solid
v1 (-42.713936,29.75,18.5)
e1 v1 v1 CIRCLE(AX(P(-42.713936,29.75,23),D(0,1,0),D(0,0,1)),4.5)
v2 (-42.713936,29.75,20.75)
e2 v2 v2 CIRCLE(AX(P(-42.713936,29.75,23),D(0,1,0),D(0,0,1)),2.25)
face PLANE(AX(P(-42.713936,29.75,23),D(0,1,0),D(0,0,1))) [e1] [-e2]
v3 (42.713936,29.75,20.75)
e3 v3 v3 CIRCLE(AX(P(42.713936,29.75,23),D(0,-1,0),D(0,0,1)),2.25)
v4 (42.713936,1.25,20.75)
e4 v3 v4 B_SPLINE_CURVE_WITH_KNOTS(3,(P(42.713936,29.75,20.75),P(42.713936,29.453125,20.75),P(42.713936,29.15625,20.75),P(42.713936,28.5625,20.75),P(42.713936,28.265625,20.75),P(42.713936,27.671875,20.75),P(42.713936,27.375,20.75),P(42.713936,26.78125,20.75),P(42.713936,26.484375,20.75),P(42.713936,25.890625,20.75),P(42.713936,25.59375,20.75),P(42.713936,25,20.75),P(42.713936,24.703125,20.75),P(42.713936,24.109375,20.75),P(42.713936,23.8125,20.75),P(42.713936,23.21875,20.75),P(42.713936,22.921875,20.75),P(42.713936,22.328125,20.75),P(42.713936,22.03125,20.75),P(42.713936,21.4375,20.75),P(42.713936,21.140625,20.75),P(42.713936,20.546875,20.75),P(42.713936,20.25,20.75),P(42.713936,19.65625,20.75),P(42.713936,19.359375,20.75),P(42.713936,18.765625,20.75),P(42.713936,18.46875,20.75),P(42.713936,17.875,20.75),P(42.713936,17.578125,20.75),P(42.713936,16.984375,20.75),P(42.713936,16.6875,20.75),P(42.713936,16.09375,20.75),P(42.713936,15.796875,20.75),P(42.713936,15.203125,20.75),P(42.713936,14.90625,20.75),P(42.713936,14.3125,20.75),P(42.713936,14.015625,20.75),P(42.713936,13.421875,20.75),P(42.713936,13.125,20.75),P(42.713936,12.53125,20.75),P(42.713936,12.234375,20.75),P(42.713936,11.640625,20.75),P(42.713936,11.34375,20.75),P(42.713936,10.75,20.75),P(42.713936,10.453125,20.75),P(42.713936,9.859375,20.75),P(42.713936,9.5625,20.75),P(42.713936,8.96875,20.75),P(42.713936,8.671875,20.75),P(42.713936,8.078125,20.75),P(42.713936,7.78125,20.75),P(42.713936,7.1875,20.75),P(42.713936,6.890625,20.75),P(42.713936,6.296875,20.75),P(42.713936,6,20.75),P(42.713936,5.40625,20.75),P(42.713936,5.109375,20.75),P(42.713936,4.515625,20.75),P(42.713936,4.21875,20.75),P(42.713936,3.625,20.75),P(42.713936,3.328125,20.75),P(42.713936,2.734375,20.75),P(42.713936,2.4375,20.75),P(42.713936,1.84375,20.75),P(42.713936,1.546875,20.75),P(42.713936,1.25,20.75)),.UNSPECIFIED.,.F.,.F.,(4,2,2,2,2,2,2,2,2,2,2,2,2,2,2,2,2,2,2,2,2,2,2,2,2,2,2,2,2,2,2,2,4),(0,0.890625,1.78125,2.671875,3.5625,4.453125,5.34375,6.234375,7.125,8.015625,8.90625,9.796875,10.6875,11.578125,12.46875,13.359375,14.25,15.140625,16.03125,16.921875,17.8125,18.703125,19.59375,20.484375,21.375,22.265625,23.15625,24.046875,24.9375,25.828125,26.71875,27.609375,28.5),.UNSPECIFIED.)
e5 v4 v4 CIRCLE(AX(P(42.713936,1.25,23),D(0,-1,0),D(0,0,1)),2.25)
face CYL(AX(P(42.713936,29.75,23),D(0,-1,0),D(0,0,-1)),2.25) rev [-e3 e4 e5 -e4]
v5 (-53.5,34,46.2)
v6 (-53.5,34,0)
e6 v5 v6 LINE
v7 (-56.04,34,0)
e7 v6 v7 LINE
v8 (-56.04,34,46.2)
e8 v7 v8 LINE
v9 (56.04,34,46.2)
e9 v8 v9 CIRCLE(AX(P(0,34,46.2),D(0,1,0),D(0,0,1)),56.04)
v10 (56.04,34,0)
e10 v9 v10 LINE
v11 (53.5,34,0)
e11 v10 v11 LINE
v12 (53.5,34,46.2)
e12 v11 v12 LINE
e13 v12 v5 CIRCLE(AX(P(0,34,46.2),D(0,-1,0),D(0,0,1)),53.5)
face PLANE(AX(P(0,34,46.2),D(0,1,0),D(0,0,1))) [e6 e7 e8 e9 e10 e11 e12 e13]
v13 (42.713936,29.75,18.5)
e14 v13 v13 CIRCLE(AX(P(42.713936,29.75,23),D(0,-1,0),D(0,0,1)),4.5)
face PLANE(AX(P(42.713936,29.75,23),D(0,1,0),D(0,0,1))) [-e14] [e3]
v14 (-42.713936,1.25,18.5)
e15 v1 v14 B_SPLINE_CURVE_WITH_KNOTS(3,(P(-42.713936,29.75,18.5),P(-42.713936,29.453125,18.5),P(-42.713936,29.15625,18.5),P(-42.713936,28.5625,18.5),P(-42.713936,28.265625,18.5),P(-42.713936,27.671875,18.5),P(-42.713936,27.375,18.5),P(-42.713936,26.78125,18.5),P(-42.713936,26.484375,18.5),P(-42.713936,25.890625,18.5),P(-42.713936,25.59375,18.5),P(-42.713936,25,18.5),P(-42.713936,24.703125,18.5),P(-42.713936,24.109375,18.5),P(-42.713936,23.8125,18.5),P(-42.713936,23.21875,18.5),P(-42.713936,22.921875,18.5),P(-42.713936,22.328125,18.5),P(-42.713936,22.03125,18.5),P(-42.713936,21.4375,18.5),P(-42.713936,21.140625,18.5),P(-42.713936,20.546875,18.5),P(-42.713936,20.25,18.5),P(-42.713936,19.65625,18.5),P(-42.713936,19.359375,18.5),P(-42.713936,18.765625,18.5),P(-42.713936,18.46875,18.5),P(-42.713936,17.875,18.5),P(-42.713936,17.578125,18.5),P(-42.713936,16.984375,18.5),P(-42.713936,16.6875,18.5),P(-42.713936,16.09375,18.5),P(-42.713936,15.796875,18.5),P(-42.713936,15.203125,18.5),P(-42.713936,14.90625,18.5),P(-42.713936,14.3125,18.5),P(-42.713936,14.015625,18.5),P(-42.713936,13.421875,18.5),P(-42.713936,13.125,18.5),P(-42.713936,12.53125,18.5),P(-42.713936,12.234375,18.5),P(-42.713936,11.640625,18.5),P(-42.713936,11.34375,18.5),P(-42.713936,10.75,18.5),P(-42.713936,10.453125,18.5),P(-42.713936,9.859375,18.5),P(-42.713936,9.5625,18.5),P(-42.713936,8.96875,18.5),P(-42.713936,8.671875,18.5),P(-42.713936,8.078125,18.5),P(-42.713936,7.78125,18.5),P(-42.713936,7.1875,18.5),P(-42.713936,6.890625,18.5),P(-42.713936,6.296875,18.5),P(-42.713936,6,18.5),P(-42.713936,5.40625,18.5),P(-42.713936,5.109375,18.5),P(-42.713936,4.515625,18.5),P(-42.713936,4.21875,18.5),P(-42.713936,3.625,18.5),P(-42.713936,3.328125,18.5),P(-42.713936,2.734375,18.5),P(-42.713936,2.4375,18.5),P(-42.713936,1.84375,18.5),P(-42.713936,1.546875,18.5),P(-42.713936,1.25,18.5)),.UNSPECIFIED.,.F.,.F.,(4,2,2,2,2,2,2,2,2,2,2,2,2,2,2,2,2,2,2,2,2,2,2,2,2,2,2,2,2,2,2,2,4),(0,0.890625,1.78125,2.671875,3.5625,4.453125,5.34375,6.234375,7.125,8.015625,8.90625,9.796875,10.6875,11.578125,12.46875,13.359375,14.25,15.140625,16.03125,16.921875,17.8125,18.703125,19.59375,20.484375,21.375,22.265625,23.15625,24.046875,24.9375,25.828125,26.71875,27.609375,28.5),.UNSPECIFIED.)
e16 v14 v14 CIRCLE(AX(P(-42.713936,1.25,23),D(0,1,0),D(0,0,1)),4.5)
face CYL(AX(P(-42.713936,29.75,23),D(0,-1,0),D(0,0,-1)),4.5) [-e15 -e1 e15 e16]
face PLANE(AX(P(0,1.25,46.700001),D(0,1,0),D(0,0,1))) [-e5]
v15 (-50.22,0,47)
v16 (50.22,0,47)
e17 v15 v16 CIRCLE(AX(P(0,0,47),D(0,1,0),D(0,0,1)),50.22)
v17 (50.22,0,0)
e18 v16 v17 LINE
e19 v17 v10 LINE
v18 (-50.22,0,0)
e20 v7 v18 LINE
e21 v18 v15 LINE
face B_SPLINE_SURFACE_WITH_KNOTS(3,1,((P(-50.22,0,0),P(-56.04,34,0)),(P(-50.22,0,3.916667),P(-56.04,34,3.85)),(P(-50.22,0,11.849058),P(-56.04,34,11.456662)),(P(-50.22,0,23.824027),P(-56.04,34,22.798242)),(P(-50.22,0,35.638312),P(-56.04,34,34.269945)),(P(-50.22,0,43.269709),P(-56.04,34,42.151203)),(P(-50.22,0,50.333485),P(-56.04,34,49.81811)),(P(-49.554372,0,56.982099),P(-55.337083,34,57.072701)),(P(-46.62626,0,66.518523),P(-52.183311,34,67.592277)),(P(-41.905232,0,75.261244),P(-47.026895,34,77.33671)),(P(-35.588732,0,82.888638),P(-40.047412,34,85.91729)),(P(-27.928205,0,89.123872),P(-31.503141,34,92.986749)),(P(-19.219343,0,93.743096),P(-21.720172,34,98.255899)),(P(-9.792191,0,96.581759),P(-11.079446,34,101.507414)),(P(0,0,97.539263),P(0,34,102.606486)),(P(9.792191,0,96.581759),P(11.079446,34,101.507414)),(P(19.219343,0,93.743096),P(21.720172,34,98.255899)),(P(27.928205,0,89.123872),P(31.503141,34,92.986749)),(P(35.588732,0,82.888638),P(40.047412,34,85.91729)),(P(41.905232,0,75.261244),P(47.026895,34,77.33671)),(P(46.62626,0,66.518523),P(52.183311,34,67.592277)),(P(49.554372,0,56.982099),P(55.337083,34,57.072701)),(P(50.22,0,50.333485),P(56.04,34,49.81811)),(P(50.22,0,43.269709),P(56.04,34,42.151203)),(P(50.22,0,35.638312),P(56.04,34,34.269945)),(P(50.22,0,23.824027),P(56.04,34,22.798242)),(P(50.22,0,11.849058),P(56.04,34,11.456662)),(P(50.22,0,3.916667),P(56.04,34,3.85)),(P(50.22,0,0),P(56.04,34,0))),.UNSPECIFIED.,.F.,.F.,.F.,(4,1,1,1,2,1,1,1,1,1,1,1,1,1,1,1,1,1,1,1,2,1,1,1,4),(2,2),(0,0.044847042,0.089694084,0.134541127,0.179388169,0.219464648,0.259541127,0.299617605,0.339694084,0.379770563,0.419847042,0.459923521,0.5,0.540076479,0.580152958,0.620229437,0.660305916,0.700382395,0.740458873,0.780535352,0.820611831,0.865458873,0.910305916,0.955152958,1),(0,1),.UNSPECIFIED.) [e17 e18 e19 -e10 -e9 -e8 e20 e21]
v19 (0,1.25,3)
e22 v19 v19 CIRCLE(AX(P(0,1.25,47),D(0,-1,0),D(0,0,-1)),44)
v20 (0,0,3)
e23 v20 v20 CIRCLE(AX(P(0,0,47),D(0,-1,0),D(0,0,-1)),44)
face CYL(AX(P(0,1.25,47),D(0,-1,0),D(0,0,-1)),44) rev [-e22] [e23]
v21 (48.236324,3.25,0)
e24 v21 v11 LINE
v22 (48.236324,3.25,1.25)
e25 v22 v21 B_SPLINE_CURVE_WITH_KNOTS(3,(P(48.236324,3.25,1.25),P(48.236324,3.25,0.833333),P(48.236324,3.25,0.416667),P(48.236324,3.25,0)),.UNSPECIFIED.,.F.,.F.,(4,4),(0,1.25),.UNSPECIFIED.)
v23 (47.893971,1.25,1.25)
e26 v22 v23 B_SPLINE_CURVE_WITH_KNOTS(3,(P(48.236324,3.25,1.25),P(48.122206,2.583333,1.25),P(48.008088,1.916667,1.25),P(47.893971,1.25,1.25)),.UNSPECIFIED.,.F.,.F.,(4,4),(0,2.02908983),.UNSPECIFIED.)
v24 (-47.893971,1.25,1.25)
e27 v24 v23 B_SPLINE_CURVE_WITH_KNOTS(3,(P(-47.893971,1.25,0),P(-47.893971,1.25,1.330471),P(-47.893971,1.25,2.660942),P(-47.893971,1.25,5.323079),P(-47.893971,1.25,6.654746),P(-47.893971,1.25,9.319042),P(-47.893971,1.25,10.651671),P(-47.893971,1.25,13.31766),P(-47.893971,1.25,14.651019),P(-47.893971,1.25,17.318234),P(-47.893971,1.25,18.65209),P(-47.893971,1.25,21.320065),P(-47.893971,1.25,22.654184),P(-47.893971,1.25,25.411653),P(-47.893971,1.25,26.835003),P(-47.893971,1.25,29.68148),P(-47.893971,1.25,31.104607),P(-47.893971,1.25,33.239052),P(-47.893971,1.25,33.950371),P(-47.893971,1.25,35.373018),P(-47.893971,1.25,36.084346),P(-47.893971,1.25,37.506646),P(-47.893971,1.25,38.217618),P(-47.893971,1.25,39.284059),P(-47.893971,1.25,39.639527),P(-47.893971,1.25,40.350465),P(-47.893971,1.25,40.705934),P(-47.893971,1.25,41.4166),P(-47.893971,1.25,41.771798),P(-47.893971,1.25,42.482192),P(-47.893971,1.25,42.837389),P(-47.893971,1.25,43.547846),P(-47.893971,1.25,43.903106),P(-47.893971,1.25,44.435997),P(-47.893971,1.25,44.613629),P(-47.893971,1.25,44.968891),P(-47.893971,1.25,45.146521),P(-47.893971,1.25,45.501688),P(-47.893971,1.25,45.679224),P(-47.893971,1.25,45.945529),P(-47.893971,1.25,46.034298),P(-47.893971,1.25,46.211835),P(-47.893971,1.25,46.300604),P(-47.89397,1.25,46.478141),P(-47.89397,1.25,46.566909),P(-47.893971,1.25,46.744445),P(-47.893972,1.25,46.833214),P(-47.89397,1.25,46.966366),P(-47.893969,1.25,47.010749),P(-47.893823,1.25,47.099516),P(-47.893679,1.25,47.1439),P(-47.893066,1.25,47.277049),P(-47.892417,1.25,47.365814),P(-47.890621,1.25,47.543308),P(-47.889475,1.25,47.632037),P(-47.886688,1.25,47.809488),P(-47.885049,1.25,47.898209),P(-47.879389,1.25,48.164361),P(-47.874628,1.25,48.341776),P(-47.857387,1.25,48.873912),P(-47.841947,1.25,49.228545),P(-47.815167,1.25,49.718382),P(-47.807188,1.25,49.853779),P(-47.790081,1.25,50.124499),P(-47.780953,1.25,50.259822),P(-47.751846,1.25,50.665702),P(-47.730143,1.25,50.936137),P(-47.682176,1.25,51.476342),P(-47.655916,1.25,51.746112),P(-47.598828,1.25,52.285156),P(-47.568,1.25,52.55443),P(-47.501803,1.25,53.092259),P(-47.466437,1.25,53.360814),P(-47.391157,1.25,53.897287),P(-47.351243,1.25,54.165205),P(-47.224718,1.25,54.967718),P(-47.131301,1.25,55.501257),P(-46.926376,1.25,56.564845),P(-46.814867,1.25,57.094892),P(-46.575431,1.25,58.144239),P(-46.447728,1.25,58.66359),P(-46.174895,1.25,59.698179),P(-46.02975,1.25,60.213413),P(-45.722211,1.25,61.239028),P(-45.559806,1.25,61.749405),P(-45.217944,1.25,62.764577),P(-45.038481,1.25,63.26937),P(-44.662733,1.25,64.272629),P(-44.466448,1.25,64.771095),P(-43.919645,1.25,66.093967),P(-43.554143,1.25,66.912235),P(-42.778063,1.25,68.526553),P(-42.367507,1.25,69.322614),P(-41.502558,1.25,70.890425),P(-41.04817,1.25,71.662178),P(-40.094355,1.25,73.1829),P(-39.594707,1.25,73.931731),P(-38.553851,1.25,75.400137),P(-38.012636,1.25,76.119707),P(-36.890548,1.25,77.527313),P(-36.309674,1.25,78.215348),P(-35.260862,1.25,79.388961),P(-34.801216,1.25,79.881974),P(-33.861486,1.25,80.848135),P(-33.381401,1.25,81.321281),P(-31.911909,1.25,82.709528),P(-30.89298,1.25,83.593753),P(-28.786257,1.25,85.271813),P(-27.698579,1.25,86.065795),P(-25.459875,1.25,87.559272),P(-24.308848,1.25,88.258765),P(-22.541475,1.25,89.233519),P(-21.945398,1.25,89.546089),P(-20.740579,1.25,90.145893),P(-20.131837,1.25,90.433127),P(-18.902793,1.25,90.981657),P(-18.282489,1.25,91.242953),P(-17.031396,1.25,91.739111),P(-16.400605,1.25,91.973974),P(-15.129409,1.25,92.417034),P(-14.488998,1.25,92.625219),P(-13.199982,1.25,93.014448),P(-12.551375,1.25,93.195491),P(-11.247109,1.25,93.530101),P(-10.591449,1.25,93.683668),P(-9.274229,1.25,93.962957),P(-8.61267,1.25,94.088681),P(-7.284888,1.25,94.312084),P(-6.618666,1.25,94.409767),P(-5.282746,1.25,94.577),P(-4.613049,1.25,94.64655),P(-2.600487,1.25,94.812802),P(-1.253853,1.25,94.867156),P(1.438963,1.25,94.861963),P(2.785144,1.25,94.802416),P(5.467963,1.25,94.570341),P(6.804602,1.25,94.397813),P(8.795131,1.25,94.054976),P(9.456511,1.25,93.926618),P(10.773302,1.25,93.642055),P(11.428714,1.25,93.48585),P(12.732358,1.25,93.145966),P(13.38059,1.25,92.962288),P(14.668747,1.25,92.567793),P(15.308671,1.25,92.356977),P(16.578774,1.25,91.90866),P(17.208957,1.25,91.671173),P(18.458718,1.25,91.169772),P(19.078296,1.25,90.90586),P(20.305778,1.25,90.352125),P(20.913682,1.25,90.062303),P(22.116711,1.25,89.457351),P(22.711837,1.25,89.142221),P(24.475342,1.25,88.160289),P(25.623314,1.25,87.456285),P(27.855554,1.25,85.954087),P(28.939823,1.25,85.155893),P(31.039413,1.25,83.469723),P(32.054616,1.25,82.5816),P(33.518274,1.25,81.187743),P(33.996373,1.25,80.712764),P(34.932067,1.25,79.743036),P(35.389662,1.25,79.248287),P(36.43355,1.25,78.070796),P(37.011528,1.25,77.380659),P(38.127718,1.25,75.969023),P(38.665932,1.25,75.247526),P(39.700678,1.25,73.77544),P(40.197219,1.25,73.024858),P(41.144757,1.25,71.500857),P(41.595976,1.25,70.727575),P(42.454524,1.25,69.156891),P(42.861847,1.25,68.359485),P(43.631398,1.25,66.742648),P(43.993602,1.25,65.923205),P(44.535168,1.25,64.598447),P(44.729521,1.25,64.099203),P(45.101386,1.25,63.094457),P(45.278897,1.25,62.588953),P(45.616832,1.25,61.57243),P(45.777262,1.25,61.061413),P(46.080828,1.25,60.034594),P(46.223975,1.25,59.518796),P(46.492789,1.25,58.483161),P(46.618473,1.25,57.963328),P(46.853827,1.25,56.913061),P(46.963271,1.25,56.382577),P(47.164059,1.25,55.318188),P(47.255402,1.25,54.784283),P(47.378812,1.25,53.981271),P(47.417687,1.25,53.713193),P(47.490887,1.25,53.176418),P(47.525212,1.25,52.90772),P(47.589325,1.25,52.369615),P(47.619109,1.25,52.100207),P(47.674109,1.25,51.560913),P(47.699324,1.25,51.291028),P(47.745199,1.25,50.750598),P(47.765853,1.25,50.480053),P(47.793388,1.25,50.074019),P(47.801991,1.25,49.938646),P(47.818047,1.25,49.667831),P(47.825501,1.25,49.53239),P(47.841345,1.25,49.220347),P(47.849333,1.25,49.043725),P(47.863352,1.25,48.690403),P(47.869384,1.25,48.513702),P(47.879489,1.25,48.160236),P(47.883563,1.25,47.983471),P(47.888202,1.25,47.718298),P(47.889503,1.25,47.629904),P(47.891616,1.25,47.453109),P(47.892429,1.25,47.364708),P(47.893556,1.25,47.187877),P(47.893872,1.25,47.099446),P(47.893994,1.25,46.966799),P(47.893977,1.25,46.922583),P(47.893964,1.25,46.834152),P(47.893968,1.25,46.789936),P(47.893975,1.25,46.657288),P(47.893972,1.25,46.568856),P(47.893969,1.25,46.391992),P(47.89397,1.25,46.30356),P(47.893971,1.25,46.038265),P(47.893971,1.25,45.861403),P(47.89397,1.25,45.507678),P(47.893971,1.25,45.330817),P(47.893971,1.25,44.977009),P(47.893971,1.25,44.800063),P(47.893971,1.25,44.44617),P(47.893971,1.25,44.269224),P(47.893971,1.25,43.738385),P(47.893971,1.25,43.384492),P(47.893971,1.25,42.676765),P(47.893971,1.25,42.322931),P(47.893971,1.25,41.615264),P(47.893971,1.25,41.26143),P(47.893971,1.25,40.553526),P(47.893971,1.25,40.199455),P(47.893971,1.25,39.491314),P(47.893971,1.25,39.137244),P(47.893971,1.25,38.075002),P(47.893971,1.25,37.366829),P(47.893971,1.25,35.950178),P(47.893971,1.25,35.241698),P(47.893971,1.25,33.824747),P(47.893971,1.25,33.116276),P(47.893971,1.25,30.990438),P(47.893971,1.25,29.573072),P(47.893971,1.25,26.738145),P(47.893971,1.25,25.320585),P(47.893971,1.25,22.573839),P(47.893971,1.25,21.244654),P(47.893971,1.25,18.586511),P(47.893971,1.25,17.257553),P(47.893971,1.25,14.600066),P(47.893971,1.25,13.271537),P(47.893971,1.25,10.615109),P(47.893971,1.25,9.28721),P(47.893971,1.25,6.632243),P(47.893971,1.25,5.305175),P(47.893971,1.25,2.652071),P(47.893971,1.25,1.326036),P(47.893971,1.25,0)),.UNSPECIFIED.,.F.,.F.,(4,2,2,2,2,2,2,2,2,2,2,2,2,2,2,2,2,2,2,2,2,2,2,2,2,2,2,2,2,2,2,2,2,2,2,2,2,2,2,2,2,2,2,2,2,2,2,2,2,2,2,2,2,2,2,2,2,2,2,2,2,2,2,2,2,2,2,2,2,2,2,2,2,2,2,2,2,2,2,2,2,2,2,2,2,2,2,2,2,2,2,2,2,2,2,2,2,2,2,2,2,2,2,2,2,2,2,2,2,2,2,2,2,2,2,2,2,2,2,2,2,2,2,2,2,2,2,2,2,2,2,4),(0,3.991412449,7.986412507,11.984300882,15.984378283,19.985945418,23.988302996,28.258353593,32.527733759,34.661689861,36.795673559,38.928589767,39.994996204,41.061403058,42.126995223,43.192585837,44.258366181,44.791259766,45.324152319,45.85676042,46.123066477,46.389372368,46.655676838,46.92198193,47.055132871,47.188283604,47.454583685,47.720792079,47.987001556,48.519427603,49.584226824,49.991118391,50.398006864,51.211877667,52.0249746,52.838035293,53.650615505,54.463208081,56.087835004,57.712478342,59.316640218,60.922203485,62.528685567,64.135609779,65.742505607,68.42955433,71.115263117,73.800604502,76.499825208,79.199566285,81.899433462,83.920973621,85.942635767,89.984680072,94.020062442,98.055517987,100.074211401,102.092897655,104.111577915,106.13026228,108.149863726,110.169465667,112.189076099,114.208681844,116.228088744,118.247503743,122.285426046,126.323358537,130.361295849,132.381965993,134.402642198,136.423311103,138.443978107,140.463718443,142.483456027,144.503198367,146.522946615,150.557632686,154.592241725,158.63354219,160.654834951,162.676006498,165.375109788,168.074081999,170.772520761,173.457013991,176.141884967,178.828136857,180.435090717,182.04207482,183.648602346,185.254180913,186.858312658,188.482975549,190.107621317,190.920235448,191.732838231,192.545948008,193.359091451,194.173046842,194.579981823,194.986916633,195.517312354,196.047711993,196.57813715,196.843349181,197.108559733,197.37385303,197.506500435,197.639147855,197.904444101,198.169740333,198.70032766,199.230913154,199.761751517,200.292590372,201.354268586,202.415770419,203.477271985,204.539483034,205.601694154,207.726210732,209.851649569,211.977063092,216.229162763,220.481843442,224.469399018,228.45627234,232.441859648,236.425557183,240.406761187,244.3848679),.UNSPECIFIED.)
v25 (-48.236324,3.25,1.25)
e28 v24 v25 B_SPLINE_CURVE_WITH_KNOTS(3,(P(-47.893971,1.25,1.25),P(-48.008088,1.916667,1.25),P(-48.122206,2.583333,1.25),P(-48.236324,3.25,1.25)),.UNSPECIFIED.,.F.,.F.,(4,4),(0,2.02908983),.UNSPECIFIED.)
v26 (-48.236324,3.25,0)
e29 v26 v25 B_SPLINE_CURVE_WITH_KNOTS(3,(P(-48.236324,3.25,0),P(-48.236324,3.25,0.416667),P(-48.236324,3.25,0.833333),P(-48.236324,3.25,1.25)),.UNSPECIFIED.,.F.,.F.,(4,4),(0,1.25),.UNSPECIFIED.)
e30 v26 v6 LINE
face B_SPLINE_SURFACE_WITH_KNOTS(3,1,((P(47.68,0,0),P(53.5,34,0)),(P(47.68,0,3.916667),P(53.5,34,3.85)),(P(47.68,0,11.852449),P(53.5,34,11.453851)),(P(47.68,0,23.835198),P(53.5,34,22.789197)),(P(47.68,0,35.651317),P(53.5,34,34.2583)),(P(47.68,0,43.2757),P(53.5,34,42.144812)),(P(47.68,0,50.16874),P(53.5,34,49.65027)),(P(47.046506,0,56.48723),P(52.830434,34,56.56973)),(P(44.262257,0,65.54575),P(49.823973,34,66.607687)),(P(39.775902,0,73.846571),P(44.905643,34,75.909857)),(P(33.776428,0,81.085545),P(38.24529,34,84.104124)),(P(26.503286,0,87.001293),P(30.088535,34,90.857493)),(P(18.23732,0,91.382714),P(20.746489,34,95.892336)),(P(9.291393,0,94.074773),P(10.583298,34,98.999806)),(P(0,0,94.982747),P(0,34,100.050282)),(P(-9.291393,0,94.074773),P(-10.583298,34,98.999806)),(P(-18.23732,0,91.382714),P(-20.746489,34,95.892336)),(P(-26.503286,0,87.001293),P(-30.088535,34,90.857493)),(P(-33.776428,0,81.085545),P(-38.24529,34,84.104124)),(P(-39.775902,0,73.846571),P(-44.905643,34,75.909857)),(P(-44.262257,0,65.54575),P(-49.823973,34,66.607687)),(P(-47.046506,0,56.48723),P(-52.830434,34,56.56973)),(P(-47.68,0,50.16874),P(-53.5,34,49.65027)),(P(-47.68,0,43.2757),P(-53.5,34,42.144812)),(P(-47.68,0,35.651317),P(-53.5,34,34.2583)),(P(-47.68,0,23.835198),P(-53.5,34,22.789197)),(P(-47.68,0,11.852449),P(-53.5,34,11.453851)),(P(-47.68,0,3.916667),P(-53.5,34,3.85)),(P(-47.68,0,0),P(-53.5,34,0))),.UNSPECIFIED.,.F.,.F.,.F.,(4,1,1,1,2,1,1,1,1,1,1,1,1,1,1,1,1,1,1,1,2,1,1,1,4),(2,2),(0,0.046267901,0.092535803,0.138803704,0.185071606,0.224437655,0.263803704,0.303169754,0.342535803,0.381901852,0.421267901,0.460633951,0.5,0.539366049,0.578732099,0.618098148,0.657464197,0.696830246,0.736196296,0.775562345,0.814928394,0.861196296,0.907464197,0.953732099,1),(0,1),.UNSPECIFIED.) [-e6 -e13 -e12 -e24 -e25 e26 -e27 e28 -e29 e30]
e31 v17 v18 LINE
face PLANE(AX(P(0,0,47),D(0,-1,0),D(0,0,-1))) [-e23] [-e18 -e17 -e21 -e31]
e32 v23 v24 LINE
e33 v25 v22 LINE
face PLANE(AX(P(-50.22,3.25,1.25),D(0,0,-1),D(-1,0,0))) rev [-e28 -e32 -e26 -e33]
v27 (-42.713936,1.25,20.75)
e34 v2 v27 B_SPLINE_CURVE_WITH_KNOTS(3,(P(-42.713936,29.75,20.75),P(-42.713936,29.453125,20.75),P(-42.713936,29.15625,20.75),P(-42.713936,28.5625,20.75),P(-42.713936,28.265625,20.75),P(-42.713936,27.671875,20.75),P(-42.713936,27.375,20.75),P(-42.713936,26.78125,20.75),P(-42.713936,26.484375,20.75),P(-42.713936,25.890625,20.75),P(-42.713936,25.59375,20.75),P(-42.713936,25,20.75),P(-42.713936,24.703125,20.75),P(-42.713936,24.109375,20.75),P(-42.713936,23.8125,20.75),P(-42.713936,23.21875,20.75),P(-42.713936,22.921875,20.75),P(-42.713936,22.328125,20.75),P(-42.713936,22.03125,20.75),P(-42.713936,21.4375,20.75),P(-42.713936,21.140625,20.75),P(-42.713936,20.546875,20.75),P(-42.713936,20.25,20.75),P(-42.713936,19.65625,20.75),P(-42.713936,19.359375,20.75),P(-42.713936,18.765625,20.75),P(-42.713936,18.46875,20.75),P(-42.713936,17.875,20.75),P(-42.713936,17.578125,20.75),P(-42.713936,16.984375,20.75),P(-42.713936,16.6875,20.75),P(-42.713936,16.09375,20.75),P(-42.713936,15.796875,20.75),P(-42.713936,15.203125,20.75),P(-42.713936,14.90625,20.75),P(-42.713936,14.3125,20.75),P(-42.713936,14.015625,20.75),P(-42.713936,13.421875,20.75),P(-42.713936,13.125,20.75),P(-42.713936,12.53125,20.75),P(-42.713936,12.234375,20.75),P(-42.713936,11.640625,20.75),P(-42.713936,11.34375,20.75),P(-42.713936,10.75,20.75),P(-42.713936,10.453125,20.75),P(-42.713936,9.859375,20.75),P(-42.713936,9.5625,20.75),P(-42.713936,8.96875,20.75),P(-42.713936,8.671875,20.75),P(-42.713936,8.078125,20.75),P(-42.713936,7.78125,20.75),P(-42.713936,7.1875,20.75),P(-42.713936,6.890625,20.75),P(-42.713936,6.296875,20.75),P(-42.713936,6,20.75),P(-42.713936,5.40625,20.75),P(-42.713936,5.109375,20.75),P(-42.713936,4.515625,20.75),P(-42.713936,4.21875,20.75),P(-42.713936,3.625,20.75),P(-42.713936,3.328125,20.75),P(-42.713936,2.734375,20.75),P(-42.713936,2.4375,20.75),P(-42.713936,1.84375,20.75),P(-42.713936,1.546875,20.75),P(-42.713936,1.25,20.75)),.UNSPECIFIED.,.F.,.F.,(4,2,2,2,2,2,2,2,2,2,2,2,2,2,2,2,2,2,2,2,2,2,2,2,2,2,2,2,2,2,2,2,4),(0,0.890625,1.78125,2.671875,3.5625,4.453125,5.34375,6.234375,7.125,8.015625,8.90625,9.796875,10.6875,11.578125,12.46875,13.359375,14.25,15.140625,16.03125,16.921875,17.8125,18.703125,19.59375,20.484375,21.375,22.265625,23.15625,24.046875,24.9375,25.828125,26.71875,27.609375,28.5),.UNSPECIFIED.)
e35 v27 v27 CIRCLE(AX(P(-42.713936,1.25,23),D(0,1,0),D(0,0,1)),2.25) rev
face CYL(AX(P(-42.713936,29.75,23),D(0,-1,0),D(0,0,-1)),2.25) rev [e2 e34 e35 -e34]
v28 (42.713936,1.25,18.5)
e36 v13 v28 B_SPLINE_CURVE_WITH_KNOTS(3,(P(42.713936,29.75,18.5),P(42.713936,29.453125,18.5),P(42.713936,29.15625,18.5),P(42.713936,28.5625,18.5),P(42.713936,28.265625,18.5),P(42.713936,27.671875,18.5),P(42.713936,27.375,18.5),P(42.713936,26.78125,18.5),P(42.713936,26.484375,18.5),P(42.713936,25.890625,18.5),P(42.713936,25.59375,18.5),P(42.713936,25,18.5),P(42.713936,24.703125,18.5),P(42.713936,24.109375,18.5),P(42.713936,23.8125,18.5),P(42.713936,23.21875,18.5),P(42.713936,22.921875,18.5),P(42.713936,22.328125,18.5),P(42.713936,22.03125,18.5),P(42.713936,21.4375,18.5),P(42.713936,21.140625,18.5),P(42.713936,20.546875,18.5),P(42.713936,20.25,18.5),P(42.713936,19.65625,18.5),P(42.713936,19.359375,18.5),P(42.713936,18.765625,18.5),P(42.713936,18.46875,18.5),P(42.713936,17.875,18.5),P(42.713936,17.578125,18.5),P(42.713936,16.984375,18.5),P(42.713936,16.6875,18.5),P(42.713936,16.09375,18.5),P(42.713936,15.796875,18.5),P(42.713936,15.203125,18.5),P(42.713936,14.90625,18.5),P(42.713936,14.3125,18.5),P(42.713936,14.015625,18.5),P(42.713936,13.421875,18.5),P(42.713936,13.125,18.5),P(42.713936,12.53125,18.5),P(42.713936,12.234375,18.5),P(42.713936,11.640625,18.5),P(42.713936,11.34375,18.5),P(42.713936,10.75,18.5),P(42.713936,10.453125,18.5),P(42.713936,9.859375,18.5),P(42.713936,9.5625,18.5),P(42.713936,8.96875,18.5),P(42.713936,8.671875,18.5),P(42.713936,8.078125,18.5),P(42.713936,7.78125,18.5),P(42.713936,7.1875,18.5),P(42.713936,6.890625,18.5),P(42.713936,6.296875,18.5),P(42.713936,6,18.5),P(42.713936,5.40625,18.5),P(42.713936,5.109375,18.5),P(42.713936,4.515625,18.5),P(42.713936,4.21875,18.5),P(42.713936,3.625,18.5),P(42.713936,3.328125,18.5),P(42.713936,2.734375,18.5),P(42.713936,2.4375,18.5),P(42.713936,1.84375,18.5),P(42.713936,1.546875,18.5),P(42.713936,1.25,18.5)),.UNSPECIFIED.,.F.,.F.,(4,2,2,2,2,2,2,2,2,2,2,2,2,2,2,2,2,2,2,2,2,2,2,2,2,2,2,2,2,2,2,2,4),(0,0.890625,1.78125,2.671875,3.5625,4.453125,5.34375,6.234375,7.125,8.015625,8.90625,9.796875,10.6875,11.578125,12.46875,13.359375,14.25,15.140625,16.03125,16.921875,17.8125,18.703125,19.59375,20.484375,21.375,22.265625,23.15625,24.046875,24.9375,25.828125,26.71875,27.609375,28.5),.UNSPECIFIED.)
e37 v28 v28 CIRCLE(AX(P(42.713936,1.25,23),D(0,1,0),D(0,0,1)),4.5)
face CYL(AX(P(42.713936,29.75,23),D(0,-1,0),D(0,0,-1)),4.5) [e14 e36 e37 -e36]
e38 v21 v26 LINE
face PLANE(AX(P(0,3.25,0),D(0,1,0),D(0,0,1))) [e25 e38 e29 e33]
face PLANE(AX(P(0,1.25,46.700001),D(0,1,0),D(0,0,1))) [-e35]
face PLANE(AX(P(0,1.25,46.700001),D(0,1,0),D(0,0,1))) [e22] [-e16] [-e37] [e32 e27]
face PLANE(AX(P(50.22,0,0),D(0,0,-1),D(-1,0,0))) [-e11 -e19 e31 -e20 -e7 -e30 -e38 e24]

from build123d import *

# Parameters (mm, degrees)
SKETCH3_R                 = 44
BOSS_EXTRUDE1_DEPTH       = 1.25
SKETCH4_W                 = 100.44
SKETCH4_H                 = 1.25
BOSS_EXTRUDE2_DEPTH       = 2
BOSS_EXTRUDE3_OUTLINE_R   = 4.5
BOSS_EXTRUDE3_OUTLINE_R_2 = 2.25
BOSS_EXTRUDE3_DEPTH       = 28.5


with BuildPart() as part:
    # Sketch1 → Loft1 section 0
    with BuildSketch(Plane(origin=(0, 0, 0), x_dir=(1, 0, 0), z_dir=(0, 1, 0))):
        with BuildLine():
            Line((47.68, 0), (47.68, -47))
            ThreePointArc((47.68, -47), (0, -94.68), (-47.68, -47))
            Line((-47.68, -47), (-47.68, 0))
            Line((-47.68, 0), (-50.22, 0))
            Line((-50.22, 0), (-50.22, -47))
            ThreePointArc((-50.22, -47), (0, -97.22), (50.22, -47))
            Line((50.22, -47), (50.22, 0))
            Line((50.22, 0), (47.68, 0))
        make_face()
    # Sketch2 → Loft1 section 1
    with BuildSketch(Plane(origin=(0, 34, 0), x_dir=(1, 0, 0), z_dir=(0, 1, 0))):
        with BuildLine():
            Line((-56.04, 0), (-56.04, -46.2))
            ThreePointArc((-56.04, -46.2), (0, -102.24), (56.04, -46.2))
            Line((56.04, -46.2), (56.04, 0))
            Line((56.04, 0), (53.5, 0))
            Line((53.5, 0), (53.5, -46.2))
            ThreePointArc((53.5, -46.2), (0, -99.7), (-53.5, -46.2))
            Line((-53.5, -46.2), (-53.5, 0))
            Line((-53.5, 0), (-56.04, 0))
        make_face()
    loft()

    # Sketch3 → Boss-Extrude1 (add)
    with BuildSketch(Plane.XZ):
        with BuildLine():
            Line((-50.219775987, 0), (50.219775987, 0))
            Line((50.219775987, 0), (50.219775987, 46.850000669))
            ThreePointArc((50.219775987, 46.850000669), (0, 96.920001338), (-50.219775987, 46.850000669))
            Line((-50.219775987, 46.850000669), (-50.219775987, 0))
        make_face()
        with Locations(Location((0, 47, 0), (0, 0, 270))):
            Circle(SKETCH3_R, mode=Mode.SUBTRACT)
    extrude(amount=-BOSS_EXTRUDE1_DEPTH)

    # Sketch4 → Boss-Extrude2 (add)
    with BuildSketch(Plane(origin=(0, 1.25, 0), x_dir=(1, 0, 0), z_dir=(0, 1, 0))):
        with Locations((0, -0.625)):
            Rectangle(SKETCH4_W, SKETCH4_H)
    extrude(amount=BOSS_EXTRUDE2_DEPTH)

    # Boss-Extrude3: read off the stored shape, not the designer's step
    # Boss-Extrude3 outline → Boss-Extrude3 (add)
    with BuildSketch(Plane(origin=(0, 1.25, 0), x_dir=(1, 0, 0), z_dir=(0, 1, 0))):
        with Locations((-42.713936364, -23)):
            Circle(BOSS_EXTRUDE3_OUTLINE_R)
        with Locations((-42.713936364, -23)):
            Circle(BOSS_EXTRUDE3_OUTLINE_R_2, mode=Mode.SUBTRACT)
    boss_extrude3 = extrude(amount=BOSS_EXTRUDE3_DEPTH)

    # Mirror1: Boss-Extrude3 across plane
    add(boss_extrude3.mirror(Plane(origin=(0, 0, 0), x_dir=(0, 0, 1), z_dir=(1, 0, 0))))


solid = part.part
